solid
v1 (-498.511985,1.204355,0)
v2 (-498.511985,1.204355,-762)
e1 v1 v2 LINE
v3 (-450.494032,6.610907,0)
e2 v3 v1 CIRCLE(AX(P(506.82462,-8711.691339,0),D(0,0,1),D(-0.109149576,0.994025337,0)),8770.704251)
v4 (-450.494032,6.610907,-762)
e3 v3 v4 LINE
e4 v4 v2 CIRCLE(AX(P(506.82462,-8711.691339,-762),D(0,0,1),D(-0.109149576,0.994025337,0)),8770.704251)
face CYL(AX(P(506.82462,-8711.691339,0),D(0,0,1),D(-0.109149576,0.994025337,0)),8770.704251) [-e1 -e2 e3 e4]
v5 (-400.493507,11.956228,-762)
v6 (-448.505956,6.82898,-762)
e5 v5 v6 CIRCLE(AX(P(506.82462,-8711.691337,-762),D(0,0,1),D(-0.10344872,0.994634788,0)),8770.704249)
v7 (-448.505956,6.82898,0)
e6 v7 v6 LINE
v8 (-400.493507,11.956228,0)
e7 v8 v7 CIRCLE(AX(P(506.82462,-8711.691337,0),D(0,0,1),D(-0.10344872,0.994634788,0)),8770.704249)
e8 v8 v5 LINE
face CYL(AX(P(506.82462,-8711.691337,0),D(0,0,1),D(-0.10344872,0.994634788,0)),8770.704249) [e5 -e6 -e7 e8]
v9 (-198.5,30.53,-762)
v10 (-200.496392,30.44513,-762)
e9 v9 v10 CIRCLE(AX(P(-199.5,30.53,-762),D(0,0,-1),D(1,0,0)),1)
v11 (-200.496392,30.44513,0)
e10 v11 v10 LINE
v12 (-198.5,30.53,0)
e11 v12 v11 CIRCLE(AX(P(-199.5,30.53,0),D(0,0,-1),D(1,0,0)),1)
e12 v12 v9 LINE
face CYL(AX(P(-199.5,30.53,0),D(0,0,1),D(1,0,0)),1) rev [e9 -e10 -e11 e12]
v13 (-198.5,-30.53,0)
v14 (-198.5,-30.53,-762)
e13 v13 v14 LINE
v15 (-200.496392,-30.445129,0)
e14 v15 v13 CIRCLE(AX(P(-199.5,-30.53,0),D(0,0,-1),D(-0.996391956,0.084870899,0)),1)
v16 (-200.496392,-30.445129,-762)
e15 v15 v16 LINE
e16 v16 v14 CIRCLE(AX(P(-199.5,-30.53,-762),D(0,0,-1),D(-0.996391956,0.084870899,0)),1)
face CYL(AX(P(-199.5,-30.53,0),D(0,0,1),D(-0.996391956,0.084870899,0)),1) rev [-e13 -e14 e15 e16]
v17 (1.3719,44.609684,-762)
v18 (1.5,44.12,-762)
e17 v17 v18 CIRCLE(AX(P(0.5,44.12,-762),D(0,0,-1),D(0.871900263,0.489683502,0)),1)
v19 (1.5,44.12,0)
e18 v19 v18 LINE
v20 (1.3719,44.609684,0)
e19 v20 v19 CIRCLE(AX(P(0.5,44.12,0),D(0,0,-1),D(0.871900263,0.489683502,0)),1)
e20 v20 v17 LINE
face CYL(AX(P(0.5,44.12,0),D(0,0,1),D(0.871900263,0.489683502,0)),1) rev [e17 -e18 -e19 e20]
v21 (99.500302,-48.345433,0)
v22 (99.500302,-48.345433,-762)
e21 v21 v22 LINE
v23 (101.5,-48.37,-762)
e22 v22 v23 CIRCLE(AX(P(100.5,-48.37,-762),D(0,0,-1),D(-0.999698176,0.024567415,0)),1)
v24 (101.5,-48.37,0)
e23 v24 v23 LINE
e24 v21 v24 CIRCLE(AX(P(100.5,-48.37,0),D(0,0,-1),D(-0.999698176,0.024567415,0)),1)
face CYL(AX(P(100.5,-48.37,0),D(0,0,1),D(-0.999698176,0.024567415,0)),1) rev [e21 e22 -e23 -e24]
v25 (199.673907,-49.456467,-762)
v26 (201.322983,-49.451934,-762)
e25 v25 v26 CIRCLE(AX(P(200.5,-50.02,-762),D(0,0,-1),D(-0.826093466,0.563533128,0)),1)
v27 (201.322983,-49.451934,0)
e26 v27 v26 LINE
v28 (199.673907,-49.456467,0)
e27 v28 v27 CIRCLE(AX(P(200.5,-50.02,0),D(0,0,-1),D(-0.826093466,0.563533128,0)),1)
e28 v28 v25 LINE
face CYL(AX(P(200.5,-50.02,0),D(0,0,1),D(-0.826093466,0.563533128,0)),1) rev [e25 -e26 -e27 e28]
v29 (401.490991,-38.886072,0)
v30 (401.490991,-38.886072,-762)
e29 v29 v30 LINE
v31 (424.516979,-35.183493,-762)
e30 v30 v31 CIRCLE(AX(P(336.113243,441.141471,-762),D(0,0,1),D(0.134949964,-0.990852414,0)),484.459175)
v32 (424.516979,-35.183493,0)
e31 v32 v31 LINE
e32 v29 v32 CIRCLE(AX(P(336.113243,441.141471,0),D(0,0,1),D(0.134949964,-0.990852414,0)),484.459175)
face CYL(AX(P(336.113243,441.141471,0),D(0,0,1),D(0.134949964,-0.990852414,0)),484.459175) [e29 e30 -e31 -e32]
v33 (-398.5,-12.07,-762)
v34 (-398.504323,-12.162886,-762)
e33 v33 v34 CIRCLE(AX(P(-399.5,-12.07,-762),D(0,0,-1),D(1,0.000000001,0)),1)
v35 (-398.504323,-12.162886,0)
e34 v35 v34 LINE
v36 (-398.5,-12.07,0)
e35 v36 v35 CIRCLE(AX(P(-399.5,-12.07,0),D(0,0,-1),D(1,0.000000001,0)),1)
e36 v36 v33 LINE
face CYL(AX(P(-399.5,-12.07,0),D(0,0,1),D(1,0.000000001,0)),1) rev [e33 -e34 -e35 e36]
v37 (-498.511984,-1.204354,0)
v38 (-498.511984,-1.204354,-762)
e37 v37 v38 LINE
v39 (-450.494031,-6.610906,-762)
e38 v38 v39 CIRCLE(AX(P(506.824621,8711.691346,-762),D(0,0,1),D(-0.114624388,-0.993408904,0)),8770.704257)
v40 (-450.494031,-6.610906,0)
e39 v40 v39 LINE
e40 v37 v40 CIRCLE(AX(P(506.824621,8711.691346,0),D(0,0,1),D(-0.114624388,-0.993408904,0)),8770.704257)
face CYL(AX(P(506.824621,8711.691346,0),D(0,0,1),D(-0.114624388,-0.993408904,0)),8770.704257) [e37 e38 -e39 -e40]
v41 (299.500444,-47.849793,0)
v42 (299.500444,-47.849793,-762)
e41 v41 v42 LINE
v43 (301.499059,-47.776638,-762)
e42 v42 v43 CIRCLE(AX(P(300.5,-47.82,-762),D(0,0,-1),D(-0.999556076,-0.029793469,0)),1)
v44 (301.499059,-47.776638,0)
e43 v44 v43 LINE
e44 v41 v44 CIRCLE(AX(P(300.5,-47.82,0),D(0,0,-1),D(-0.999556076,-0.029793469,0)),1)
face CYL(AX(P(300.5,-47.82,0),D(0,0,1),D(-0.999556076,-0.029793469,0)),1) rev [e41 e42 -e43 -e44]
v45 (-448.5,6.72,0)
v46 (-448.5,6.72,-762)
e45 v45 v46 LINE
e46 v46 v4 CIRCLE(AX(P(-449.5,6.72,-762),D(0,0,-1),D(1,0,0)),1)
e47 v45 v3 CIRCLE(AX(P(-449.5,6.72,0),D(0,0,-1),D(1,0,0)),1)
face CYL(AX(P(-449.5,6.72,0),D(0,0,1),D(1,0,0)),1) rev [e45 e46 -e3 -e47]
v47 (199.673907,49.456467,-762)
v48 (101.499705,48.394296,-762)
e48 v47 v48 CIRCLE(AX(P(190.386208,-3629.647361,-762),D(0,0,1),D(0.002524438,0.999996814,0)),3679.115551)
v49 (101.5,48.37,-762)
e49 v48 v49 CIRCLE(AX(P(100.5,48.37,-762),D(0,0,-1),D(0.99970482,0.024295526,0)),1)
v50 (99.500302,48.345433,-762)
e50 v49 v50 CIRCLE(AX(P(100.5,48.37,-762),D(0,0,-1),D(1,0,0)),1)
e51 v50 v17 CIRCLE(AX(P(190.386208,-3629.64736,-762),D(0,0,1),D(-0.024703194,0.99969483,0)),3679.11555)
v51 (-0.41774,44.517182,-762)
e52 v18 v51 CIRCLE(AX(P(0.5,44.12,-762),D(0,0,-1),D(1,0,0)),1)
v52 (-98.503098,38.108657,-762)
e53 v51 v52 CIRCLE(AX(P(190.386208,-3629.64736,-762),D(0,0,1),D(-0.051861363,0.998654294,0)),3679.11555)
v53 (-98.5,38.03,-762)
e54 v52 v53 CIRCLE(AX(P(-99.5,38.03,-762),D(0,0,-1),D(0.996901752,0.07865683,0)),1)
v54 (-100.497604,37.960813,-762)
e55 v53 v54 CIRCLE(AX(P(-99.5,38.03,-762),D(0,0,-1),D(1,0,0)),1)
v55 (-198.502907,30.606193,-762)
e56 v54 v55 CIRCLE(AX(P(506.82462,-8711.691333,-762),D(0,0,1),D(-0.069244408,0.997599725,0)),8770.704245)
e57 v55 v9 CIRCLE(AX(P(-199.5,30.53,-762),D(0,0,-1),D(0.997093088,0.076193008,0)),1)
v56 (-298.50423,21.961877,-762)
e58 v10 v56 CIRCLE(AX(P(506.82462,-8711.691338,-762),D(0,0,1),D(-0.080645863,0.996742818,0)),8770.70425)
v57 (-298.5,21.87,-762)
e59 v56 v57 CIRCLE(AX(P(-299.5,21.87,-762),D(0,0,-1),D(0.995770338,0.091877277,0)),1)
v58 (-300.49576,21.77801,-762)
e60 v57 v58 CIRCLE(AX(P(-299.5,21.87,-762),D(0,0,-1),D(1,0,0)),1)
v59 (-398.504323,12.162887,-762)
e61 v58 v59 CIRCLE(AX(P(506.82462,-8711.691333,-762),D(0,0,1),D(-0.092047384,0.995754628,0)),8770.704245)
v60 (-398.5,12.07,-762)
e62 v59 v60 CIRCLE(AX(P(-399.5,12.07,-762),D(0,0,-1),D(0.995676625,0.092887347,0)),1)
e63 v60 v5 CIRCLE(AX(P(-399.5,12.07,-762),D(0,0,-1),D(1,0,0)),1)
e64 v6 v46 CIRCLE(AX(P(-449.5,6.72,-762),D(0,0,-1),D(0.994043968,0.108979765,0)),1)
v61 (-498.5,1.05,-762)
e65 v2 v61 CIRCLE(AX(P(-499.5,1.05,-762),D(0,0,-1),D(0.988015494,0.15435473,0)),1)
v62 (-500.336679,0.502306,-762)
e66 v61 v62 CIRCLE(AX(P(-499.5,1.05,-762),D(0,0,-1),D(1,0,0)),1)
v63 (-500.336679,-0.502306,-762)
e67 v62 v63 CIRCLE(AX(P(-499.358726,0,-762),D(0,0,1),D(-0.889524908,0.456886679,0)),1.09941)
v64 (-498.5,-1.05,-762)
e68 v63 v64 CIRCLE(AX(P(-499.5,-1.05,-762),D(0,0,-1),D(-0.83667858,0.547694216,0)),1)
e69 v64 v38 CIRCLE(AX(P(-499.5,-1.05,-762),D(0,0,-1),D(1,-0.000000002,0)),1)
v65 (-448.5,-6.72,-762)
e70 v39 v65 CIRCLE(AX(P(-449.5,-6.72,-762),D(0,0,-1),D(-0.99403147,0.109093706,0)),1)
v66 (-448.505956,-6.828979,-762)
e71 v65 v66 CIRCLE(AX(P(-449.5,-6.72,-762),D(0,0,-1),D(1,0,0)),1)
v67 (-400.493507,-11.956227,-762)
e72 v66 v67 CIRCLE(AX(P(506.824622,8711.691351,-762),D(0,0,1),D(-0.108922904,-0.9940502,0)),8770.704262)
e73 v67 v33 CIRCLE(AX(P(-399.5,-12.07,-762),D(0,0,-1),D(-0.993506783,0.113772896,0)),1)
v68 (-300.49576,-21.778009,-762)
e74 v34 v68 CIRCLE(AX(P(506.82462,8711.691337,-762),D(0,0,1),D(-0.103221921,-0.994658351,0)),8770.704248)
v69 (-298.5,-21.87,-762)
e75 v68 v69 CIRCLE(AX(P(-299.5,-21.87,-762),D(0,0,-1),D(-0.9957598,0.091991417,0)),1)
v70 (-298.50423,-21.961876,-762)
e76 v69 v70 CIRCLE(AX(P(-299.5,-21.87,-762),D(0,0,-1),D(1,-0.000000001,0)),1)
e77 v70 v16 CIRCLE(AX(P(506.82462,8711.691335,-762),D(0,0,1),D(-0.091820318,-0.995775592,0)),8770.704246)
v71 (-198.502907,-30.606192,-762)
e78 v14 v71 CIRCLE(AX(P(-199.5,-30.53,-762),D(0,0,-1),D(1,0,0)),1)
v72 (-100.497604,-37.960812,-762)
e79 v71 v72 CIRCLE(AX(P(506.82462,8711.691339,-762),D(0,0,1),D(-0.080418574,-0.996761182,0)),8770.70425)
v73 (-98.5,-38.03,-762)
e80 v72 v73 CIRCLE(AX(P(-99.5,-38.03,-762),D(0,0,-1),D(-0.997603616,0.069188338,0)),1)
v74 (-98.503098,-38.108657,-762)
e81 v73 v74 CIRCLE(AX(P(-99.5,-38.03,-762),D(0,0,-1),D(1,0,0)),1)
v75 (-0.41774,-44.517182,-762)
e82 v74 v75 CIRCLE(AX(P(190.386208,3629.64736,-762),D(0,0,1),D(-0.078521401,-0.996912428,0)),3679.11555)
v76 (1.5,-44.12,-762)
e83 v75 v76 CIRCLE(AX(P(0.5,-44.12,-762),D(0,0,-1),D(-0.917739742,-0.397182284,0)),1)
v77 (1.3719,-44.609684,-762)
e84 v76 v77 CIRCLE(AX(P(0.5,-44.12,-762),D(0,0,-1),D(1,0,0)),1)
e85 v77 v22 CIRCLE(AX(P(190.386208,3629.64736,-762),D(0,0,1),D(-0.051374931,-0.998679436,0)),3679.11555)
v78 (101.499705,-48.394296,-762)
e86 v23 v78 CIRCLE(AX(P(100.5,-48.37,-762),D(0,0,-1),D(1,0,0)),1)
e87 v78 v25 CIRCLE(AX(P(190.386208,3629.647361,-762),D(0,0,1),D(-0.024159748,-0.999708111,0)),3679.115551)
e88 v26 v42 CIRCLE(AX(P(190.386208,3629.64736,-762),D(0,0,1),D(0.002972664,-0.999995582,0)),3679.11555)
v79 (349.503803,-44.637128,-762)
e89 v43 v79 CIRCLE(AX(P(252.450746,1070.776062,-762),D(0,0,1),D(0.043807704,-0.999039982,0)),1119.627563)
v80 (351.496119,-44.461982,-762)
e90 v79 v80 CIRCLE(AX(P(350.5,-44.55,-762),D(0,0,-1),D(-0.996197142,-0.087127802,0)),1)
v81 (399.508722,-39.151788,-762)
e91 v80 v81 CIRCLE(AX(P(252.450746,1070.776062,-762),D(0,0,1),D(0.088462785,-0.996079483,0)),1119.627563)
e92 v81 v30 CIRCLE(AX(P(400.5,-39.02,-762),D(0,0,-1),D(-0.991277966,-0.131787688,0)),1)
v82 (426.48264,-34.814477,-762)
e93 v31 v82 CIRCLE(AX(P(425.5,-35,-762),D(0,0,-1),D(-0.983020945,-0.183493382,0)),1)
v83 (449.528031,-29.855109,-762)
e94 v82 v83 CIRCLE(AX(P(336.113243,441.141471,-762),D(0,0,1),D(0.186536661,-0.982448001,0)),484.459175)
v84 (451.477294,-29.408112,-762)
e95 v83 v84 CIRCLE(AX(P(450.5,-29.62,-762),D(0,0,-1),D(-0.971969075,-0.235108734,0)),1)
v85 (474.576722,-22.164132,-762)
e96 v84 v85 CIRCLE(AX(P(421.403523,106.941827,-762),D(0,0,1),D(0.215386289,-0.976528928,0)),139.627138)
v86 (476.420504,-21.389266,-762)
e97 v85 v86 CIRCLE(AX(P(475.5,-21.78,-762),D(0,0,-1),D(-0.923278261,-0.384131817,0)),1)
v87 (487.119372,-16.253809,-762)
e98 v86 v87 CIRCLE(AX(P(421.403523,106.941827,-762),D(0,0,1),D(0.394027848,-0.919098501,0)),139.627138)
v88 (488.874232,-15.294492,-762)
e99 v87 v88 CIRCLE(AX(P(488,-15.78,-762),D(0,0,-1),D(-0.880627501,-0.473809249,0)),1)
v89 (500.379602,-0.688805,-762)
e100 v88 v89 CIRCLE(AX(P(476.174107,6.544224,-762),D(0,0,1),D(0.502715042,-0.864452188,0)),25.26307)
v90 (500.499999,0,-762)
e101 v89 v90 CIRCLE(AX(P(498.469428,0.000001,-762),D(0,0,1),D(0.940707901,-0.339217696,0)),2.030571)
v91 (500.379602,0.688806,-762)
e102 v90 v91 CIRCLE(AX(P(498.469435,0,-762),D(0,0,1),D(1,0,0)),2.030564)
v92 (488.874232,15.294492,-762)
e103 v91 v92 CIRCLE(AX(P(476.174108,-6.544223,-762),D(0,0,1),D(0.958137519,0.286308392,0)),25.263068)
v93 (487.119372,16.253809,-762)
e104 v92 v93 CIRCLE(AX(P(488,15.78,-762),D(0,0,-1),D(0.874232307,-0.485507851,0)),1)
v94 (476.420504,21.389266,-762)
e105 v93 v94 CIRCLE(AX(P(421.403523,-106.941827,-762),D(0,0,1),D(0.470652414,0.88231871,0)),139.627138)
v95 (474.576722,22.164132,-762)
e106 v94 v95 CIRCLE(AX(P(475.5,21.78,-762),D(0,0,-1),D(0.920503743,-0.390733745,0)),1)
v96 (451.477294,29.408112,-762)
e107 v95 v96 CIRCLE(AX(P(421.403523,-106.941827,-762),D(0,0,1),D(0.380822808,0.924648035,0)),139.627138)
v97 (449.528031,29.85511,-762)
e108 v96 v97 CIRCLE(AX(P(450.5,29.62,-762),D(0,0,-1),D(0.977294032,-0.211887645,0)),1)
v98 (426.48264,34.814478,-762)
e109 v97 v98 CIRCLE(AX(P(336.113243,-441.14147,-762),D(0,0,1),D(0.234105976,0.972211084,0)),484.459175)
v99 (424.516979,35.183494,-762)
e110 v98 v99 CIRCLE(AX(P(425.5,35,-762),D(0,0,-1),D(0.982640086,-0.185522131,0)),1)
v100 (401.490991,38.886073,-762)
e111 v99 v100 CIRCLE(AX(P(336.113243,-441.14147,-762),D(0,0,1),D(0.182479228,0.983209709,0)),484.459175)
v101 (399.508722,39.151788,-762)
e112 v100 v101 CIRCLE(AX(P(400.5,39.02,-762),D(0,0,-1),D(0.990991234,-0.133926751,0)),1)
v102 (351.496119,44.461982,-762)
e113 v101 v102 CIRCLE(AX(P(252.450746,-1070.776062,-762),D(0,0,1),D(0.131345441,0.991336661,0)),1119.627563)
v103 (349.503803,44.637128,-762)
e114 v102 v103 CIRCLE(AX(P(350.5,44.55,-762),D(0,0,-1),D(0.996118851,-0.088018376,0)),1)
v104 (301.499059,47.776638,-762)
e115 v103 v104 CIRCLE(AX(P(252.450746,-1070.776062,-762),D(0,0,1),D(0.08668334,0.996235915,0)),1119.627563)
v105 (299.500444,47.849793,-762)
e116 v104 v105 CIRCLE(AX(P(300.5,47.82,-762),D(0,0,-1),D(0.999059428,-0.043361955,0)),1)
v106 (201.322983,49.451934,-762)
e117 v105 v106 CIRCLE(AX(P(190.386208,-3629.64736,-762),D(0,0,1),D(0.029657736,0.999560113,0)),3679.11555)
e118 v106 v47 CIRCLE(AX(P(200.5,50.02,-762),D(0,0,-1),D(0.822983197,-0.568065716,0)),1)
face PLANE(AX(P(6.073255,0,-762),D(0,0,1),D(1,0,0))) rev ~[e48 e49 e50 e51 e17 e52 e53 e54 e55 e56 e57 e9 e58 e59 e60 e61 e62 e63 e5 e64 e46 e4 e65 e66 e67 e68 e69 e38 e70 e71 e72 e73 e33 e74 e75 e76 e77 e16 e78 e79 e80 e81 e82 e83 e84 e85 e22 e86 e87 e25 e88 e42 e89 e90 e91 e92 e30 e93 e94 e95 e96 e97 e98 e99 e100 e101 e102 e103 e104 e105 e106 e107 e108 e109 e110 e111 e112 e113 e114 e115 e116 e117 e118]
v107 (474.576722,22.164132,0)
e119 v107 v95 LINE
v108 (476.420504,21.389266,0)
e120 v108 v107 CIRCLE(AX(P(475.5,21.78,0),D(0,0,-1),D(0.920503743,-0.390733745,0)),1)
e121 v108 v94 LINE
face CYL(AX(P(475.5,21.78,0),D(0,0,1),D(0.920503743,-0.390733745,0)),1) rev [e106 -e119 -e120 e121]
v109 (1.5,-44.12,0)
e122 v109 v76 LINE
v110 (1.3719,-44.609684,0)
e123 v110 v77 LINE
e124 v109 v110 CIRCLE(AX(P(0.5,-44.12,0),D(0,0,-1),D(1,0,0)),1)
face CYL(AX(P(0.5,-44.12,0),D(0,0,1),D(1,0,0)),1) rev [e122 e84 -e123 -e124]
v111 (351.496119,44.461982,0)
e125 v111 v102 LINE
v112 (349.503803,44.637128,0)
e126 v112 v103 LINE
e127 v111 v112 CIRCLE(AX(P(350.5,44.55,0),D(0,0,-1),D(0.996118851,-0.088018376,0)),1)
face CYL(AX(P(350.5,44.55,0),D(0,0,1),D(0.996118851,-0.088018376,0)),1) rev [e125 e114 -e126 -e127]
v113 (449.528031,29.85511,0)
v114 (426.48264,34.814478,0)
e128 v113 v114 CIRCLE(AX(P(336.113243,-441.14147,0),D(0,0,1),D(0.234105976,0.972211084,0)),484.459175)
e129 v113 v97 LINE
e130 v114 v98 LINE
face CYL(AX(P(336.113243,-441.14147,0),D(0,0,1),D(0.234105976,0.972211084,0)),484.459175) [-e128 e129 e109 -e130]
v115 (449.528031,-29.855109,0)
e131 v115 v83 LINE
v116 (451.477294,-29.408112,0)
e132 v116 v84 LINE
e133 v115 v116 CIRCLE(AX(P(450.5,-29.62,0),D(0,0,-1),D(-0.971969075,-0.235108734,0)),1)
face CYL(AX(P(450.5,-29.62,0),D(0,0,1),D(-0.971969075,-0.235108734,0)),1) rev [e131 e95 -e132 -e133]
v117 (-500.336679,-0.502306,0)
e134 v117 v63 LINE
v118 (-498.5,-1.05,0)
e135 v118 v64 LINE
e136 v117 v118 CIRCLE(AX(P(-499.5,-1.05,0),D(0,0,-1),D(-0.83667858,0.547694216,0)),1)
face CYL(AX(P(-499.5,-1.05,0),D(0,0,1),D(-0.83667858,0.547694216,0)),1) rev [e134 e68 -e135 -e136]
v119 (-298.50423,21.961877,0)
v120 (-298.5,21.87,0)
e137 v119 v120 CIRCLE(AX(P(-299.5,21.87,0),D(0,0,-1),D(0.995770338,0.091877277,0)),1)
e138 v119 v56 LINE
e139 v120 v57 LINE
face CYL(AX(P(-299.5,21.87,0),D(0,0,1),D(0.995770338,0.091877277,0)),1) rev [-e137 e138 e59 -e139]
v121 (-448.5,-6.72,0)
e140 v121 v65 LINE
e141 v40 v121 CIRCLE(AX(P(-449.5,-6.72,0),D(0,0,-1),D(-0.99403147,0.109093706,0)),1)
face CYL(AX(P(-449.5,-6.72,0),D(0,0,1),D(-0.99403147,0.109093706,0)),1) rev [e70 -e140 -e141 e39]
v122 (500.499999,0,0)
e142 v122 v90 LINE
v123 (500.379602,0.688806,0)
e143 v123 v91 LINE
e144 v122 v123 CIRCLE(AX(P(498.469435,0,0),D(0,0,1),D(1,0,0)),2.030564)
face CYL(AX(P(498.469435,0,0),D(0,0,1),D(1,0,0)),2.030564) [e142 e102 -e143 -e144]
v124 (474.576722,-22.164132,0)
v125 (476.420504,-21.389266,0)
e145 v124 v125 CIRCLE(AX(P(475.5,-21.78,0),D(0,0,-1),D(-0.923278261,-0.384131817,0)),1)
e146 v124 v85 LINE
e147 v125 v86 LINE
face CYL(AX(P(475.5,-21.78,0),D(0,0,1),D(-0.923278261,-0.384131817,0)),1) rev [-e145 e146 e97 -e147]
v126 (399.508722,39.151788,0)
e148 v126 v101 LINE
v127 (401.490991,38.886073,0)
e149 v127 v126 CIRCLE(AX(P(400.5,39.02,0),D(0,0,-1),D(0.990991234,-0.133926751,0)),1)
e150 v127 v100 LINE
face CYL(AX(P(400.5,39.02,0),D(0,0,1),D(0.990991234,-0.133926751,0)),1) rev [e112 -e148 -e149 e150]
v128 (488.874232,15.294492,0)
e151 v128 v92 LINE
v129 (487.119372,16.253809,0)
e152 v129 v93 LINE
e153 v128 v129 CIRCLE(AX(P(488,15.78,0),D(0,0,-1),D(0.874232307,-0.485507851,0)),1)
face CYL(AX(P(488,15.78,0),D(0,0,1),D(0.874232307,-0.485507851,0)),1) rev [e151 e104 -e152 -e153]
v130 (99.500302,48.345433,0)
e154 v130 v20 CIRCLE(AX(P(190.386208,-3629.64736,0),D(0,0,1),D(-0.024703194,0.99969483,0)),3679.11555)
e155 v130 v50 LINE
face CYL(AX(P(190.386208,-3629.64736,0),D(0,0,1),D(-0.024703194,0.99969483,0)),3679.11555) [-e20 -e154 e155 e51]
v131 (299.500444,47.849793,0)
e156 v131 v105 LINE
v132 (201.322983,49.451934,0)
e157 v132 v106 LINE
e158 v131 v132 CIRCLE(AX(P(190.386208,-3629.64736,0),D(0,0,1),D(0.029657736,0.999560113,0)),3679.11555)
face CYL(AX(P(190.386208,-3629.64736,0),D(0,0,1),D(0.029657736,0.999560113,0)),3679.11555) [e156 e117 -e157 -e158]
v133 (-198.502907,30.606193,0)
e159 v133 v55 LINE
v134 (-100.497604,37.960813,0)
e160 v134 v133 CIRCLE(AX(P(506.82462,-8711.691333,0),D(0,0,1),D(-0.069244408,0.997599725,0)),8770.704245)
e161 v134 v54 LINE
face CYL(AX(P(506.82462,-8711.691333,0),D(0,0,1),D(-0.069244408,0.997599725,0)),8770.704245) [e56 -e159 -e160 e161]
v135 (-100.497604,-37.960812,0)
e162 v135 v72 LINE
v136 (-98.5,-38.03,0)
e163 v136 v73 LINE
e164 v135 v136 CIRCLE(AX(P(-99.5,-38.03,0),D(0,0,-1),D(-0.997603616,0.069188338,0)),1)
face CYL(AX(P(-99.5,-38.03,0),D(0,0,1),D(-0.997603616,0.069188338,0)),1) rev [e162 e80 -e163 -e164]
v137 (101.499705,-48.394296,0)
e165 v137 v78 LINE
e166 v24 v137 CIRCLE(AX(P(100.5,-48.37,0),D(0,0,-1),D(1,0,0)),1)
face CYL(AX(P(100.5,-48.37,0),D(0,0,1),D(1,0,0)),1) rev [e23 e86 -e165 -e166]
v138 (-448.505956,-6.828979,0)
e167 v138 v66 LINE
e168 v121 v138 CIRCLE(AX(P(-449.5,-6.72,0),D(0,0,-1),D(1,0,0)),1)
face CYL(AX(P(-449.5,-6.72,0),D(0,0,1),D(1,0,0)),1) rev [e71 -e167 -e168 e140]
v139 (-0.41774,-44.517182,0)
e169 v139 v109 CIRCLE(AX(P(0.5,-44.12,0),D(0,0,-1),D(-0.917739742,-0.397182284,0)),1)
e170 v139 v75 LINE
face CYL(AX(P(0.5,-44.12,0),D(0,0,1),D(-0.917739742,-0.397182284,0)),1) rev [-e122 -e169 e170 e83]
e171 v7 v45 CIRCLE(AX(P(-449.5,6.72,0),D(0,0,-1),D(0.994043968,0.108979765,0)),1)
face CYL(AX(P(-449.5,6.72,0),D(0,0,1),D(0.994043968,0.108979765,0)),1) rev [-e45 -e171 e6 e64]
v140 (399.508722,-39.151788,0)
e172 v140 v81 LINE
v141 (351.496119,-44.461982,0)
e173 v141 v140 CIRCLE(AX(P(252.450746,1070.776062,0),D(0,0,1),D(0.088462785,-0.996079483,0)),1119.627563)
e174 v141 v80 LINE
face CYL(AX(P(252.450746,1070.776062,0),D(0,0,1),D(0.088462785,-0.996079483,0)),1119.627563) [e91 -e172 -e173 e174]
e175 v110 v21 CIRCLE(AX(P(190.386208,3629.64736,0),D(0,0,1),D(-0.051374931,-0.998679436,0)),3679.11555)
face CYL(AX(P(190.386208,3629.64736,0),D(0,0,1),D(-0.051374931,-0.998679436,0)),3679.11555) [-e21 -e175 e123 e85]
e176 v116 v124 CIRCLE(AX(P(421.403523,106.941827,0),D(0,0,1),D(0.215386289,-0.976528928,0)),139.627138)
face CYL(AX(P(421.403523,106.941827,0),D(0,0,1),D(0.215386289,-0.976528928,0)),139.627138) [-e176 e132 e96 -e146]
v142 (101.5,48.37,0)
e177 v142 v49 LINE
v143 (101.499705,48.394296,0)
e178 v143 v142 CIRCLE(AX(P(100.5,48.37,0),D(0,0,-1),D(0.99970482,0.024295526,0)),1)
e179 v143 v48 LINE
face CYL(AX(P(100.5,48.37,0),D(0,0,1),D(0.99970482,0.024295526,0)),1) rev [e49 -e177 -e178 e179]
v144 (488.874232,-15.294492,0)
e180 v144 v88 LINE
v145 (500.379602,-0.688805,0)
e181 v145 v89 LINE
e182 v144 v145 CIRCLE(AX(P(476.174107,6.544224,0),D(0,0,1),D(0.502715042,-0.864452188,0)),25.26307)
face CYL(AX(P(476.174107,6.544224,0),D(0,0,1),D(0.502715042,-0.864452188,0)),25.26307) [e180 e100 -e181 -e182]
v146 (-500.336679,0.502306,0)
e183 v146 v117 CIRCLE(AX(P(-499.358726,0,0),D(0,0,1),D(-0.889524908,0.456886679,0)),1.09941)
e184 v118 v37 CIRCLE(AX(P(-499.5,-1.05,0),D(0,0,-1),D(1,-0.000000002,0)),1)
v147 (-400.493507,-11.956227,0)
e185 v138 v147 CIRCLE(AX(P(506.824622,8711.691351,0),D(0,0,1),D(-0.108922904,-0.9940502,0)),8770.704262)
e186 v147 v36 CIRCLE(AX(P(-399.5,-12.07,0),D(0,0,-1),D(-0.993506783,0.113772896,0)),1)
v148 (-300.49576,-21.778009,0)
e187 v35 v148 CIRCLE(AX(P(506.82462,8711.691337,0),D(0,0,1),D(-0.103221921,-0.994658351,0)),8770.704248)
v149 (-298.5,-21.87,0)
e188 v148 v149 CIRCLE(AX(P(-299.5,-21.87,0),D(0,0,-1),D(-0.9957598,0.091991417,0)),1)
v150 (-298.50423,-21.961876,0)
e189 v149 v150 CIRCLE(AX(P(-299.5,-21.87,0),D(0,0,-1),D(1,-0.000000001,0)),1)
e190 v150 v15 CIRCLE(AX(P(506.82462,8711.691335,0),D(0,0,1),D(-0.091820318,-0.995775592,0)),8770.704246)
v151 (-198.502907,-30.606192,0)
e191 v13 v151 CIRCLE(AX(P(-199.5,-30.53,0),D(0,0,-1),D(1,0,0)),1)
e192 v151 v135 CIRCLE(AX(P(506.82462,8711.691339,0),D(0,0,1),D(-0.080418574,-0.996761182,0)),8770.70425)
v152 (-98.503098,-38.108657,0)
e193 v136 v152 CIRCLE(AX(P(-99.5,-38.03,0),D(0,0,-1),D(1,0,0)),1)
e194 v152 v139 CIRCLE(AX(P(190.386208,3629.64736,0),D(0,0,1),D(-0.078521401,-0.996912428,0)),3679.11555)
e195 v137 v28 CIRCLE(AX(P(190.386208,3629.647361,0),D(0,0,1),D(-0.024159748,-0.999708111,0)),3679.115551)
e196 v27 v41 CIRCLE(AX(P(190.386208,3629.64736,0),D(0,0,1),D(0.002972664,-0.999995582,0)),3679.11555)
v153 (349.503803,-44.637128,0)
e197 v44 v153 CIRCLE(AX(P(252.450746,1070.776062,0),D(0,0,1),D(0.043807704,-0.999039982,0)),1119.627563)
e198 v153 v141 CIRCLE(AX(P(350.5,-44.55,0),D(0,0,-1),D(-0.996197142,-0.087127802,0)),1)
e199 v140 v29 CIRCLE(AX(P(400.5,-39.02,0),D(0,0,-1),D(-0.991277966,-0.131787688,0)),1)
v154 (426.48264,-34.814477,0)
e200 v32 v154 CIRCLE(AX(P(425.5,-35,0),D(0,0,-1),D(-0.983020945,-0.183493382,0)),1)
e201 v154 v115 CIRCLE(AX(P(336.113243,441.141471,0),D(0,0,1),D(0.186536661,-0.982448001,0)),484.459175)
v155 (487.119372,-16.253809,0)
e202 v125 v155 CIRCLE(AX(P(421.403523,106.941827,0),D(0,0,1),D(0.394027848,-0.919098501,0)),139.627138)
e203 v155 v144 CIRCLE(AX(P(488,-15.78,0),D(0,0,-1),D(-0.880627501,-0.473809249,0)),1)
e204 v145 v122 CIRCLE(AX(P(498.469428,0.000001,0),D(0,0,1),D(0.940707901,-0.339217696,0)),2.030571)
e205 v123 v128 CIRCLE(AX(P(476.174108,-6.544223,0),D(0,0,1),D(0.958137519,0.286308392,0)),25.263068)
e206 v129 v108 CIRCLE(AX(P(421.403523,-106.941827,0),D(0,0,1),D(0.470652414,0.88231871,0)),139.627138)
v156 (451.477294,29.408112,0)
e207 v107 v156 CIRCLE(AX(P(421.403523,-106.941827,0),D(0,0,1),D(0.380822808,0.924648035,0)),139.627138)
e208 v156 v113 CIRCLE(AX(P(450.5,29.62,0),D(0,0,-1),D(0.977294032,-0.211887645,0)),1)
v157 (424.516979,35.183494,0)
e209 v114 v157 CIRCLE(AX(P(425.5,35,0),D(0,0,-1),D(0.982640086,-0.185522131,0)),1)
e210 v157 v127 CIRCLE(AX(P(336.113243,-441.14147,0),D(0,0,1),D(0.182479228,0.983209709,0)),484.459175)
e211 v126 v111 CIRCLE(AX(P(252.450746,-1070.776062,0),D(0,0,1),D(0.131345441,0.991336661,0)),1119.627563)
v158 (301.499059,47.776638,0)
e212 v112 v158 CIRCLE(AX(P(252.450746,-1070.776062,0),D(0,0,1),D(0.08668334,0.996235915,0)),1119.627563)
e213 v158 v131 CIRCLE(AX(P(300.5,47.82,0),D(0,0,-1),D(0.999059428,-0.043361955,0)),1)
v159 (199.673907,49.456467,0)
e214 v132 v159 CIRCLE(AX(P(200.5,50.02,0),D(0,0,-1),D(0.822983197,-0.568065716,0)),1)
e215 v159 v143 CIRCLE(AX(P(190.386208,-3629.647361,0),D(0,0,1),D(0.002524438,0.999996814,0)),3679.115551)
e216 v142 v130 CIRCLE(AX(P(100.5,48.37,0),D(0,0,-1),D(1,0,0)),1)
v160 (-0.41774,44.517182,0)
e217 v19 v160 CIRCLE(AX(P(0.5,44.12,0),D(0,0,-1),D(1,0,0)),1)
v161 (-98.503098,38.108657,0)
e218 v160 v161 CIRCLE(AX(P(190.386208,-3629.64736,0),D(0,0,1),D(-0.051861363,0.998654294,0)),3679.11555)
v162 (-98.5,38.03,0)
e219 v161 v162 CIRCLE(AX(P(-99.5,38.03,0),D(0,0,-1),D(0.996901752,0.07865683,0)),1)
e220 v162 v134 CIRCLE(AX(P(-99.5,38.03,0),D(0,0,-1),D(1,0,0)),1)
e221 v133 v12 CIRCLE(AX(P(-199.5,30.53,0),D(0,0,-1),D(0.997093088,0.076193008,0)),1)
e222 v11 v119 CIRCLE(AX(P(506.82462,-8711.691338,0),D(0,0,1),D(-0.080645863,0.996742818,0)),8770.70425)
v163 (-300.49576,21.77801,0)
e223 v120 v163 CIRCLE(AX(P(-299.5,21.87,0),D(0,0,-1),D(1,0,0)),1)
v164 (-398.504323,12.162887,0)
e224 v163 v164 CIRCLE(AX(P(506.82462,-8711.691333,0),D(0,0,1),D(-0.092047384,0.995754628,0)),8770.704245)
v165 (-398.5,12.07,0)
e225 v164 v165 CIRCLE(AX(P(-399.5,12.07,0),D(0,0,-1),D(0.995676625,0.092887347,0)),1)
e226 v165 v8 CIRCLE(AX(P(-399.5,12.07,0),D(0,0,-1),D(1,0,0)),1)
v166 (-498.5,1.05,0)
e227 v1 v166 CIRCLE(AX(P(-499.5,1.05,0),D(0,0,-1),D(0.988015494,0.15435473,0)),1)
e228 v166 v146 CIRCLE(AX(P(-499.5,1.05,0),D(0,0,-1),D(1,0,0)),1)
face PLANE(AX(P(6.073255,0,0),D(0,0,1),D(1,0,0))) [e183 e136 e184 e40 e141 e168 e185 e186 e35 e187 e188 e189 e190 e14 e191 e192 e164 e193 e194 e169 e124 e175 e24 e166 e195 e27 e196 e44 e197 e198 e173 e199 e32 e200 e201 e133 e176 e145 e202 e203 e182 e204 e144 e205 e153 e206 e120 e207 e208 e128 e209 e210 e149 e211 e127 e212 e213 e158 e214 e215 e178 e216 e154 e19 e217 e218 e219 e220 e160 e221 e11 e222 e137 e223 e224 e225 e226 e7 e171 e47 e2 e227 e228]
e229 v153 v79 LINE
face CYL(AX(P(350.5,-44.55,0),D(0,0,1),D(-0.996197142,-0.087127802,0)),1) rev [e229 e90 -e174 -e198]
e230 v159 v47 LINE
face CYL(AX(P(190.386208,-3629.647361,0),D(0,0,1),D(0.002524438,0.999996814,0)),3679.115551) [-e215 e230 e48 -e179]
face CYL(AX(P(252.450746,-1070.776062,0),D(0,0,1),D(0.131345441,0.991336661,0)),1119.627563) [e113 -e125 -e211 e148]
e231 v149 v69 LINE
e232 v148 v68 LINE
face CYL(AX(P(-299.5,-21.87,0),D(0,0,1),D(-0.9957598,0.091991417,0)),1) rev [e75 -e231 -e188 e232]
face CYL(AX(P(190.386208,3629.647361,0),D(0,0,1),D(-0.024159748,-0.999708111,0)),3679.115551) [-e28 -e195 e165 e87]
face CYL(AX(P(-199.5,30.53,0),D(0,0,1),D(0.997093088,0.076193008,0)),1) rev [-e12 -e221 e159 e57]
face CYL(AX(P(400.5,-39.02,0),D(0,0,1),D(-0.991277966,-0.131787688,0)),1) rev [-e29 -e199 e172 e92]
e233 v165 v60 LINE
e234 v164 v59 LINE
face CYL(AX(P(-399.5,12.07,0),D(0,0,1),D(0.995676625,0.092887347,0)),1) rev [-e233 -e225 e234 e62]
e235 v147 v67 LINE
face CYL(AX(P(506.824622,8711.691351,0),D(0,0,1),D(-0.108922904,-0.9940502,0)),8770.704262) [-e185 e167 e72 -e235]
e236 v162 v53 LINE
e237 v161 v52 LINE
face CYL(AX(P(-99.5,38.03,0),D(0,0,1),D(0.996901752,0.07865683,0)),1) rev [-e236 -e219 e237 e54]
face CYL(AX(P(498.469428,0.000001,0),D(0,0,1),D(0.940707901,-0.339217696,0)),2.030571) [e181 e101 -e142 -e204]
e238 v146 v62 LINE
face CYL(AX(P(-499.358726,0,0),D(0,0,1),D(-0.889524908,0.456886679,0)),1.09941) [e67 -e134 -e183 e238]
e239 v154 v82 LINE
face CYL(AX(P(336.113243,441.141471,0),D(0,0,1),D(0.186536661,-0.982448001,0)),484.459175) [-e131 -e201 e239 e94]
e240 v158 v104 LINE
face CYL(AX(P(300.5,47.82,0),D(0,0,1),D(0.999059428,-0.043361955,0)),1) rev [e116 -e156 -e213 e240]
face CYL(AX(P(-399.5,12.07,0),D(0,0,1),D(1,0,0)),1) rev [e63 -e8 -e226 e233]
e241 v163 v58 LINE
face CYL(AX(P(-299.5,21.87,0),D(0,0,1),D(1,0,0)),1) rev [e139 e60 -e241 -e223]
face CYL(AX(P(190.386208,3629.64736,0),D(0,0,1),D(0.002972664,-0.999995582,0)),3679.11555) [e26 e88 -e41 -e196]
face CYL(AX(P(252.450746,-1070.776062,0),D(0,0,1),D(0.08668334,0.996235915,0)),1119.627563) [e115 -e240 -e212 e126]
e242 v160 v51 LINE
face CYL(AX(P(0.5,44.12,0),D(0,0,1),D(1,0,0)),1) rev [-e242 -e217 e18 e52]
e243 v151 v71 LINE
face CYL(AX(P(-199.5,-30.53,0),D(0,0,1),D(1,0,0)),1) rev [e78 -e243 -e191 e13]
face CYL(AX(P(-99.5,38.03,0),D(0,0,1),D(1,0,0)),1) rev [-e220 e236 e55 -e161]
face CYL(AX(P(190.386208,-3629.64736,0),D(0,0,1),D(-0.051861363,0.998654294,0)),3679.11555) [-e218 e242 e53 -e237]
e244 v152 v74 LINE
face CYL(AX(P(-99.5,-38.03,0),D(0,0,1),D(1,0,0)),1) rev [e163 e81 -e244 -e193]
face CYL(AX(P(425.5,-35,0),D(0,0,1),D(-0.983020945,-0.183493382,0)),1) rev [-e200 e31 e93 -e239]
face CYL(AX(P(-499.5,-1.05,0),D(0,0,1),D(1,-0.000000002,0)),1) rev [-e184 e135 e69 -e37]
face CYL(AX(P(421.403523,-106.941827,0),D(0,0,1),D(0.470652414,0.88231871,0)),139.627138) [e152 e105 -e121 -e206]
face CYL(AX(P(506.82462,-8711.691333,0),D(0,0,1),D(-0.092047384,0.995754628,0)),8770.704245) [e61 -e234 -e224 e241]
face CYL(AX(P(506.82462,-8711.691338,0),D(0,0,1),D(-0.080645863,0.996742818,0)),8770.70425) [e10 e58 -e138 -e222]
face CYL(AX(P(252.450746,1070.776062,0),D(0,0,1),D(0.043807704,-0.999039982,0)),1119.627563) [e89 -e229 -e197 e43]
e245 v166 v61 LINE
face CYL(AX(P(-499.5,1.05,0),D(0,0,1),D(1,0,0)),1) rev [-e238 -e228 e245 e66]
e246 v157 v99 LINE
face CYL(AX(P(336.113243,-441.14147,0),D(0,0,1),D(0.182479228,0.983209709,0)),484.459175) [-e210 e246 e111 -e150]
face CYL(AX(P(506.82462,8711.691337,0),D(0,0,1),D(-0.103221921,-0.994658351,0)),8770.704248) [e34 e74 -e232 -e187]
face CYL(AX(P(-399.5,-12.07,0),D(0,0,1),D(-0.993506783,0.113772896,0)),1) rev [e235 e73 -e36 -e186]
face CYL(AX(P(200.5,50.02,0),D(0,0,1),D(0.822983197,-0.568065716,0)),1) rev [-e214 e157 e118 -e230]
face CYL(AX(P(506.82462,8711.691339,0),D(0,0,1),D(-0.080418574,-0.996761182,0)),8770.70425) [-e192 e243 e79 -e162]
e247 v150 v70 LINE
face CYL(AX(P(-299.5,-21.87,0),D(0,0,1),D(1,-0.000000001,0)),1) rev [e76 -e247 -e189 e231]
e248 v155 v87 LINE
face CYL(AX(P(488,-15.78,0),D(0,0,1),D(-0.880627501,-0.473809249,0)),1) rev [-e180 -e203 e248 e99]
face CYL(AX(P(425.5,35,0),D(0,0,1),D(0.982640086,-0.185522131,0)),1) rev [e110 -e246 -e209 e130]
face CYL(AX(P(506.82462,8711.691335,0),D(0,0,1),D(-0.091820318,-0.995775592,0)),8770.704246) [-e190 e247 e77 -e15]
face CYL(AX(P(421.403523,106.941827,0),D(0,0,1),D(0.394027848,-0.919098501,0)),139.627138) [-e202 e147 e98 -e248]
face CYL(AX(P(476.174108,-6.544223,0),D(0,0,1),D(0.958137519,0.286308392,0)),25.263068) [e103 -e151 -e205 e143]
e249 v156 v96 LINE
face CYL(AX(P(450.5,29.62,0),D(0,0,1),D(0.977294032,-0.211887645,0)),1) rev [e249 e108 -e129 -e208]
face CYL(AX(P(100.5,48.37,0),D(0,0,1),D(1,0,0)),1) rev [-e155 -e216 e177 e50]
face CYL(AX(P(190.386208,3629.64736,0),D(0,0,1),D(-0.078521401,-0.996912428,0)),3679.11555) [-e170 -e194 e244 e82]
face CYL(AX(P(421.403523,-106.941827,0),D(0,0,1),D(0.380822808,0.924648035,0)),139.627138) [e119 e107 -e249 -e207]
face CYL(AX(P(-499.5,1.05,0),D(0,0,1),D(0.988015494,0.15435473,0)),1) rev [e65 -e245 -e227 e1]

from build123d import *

# Parameters (mm, degrees)
F1_DEPTH = 762


# Not quite as in the source:
# - ends of sketch curves that miss each other by under 0.0002 mm in the source are joined


with BuildPart() as f1:
    # F0 (on Top) → F1 (new body)
    with BuildSketch(Plane.XY):
        with BuildLine():
            ThreePointArc((488.8742323068, 15.2944921486), (487.5203307918, 14.9025505993), (487.1193724988, 16.2538092487))
            ThreePointArc((487.1193724988, 16.2538092487), (481.824523523, 18.9352573397), (476.4205037428, 21.389266255))
            ThreePointArc((476.4205037428, 21.389266255), (475.1125647356, 20.8581030883), (474.5767217389, 22.1641318166))
            ThreePointArc((474.5767217389, 22.1641318166), (463.1842997703, 26.2876905948), (451.4772940324, 29.4081123545))
            ThreePointArc((451.4772940324, 29.4081123545), (450.276485478, 28.6452994006), (449.5280311535, 29.8551096795))
            ThreePointArc((449.5280311535, 29.8551096795), (438.0355044136, 32.4749833354), (426.4826400862, 34.8144778691))
            ThreePointArc((426.4826400862, 34.8144778691), (425.3154916622, 34.0171690515), (424.5169792351, 35.1834943482))
            ThreePointArc((424.5169792351, 35.1834943482), (413.0262686458, 37.1733622263), (401.4909912337, 38.8860732489))
            ThreePointArc((401.4909912337, 38.8860732489), (400.3671427029, 38.0288648232), (399.5087220344, 39.1517876884))
            ThreePointArc((399.5087220344, 39.1517876884), (375.5310617416, 42.0658475749), (351.4961188511, 44.4619816239))
            ThreePointArc((351.4961188511, 44.4619816239), (350.4124269023, 43.5538419038), (349.5038028578, 44.6371278018))
            ThreePointArc((349.5038028578, 44.6371278018), (325.5182950967, 46.4647415416), (301.4990594281, 47.7766380455))
            ThreePointArc((301.4990594281, 47.7766380455), (300.4634214455, 46.8206692193), (299.5004439239, 47.8497934687))
            ThreePointArc((299.5004439239, 47.8497934687), (250.4170586651, 48.9784061279), (201.3229831968, 49.4519342839))
            ThreePointArc((201.3229831968, 49.4519342839), (200.4972514489, 49.0200037773), (199.6739065342, 49.4564668725))
            ThreePointArc((199.6739065342, 49.4564668725), (150.5832624149, 49.2528772685), (101.4997048201, 48.3942955287))
            ThreePointArc((101.4997048201, 48.3942955287), (101.4999262023, 48.3821486609), (101.5, 48.37))
            ThreePointArc((101.5, 48.37), (100.5122846343, 47.370075459), (99.5003018245, 48.3454325854))
            ThreePointArc((99.5003018245, 48.3454325854), (50.4236366017, 46.8049664772), (1.3719002627, 44.6096835018))
            ThreePointArc((1.3719002627, 44.6096835018), (1.4674451568, 44.3730807552), (1.5, 44.12))
            ThreePointArc((1.5, 44.12), (0.297194356, 43.1407809894), (-0.4177397415, 44.5171822841))
            ThreePointArc((-0.4177397415, 44.5171822841), (-49.4818219256, 41.6405010198), (-98.503098248, 38.1086568293))
            ThreePointArc((-98.503098248, 38.1086568293), (-98.5007748622, 38.0693589124), (-98.5, 38.03))
            ThreePointArc((-98.5, 38.03), (-99.4653855857, 37.0305992584), (-100.4976036846, 37.9608126573))
            ThreePointArc((-100.4976036846, 37.9608126573), (-149.5105569813, 34.4207797542), (-198.5029069122, 30.606193006))
            ThreePointArc((-198.5029069122, 30.606193006), (-198.5007269923, 30.568124219), (-198.5, 30.53))
            ThreePointArc((-198.5, 30.53), (-199.4575267193, 29.5309023969), (-200.4963920408, 30.445130094))
            ThreePointArc((-200.4963920408, 30.445130094), (-249.5122047164, 26.3409146536), (-298.5042296621, 21.9618772772))
            ThreePointArc((-298.5042296621, 21.9618772772), (-298.5010579752, 21.915987292), (-298.5, 21.87))
            ThreePointArc((-298.5, 21.87), (-299.4539559536, 20.8710605895), (-300.4957598916, 21.7780095749))
            ThreePointArc((-300.4957598916, 21.7780095749), (-349.5135367847, 17.1080068146), (-398.5043233752, 12.1628873449))
            ThreePointArc((-398.5043233752, 12.1628873449), (-398.5010814285, 12.1164939523), (-398.5, 12.07))
            ThreePointArc((-398.5, 12.07), (-399.443021479, 11.0716245956), (-400.4935068963, 11.9562280921))
            ThreePointArc((-400.4935068963, 11.9562280921), (-424.5032598568, 9.4256444152), (-448.5059560316, 6.8289797637))
            ThreePointArc((-448.5059560316, 6.8289797637), (-448.5014901181, 6.7745711994), (-448.5, 6.72))
            ThreePointArc((-448.5, 6.72), (-449.4453720697, 5.7214932202), (-450.4940315785, 6.6109072825))
            ThreePointArc((-450.4940315785, 6.6109072825), (-474.5067314104, 3.9406998666), (-498.5119845054, 1.2043547292))
            ThreePointArc((-498.5119845054, 1.2043547292), (-498.5030006282, 1.1274096421), (-498.5, 1.05))
            ThreePointArc((-498.5, 1.05), (-499.2142366184, 0.0916997914), (-500.3366785795, 0.5023057837))
            ThreePointArc((-500.3366785795, 0.5023057837), (-500.458136, 0), (-500.3366785795, -0.5023057837))
            ThreePointArc((-500.3366785795, -0.5023057837), (-499.2142366184, -0.0916997914), (-498.5, -1.05))
            ThreePointArc((-498.5, -1.05), (-498.5030005898, -1.1274091465), (-498.5119843519, -1.2043537469))
            ThreePointArc((-498.5119843519, -1.2043537469), (-474.5067312795, -3.9406988813), (-450.49403147, -6.6109062944))
            ThreePointArc((-450.49403147, -6.6109062944), (-449.4453715735, -5.7214932474), (-448.5, -6.72))
            ThreePointArc((-448.5, -6.72), (-448.501490091, -6.7745707031), (-448.5059559233, -6.8289787756))
            ThreePointArc((-448.5059559233, -6.8289787756), (-424.5032597461, -9.425643427), (-400.4935067831, -11.9562271039))
            ThreePointArc((-400.4935067831, -11.9562271039), (-399.4430209825, -11.0716246239), (-398.5, -12.07))
            ThreePointArc((-398.5, -12.07), (-398.5010814054, -12.1164934555), (-398.5043232828, -12.1628863545))
            ThreePointArc((-398.5043232828, -12.1628863545), (-349.5135366927, -17.1080058236), (-300.4957598, -21.7780085834))
            ThreePointArc((-300.4957598, -21.7780085834), (-299.4539554563, -20.8710606125), (-298.5, -21.87))
            ThreePointArc((-298.5, -21.87), (-298.5010579523, -21.9159867947), (-298.5042295706, -21.9618762856))
            ThreePointArc((-298.5042295706, -21.9618762856), (-249.5122046283, -26.3409136613), (-200.4963919562, -30.4451291009))
            ThreePointArc((-200.4963919562, -30.4451291009), (-199.4575262213, -29.5309024181), (-198.5, -30.53))
            ThreePointArc((-198.5, -30.53), (-198.5007269733, -30.568123721), (-198.5029068362, -30.6061920122))
            ThreePointArc((-198.5029068362, -30.6061920122), (-149.5105569088, -34.4207787596), (-100.4976036156, -37.9608116621))
            ThreePointArc((-100.4976036156, -37.9608116621), (-99.4653850872, -37.0305992757), (-98.5, -38.03))
            ThreePointArc((-98.5, -38.03), (-98.5007748622, -38.0693589124), (-98.503098248, -38.1086568293))
            ThreePointArc((-98.503098248, -38.1086568293), (-49.4818219256, -41.6405010198), (-0.4177397415, -44.5171822841))
            ThreePointArc((-0.4177397415, -44.5171822841), (0.297194356, -43.1407809894), (1.5, -44.12))
            ThreePointArc((1.5, -44.12), (1.4674451568, -44.3730807552), (1.3719002627, -44.6096835018))
            ThreePointArc((1.3719002627, -44.6096835018), (50.4236366017, -46.8049664772), (99.5003018245, -48.3454325854))
            ThreePointArc((99.5003018245, -48.3454325854), (100.5122846343, -47.370075459), (101.5, -48.37))
            ThreePointArc((101.5, -48.37), (101.4999262023, -48.3821486609), (101.4997048201, -48.3942955287))
            ThreePointArc((101.4997048201, -48.3942955287), (150.5832624149, -49.2528772685), (199.6739065342, -49.4564668725))
            ThreePointArc((199.6739065342, -49.4564668725), (200.4972514489, -49.0200037773), (201.3229831968, -49.4519342839))
            ThreePointArc((201.3229831968, -49.4519342839), (250.4170586651, -48.9784061279), (299.5004439239, -47.8497934687))
            ThreePointArc((299.5004439239, -47.8497934687), (300.4634214455, -46.8206692193), (301.4990594281, -47.7766380455))
            ThreePointArc((301.4990594281, -47.7766380455), (325.5182950967, -46.4647415416), (349.5038028578, -44.6371278018))
            ThreePointArc((349.5038028578, -44.6371278018), (350.4124269023, -43.5538419038), (351.4961188511, -44.4619816239))
            ThreePointArc((351.4961188511, -44.4619816239), (375.5310617416, -42.0658475749), (399.5087220344, -39.1517876884))
            ThreePointArc((399.5087220344, -39.1517876884), (400.3671422118, -38.0288648891), (401.490991101, -38.886072267))
            ThreePointArc((401.490991101, -38.886072267), (413.0262684891, -37.1733612515), (424.5169790547, -35.1834933817))
            ThreePointArc((424.5169790547, -35.1834933817), (425.3154916626, -34.0171690514), (426.4826399039, -34.8144769037))
            ThreePointArc((426.4826399039, -34.8144769037), (438.035504208, -32.4749823797), (449.5280309249, -29.8551087345))
            ThreePointArc((449.5280309249, -29.8551087345), (450.2764859518, -28.645299292), (451.4772940324, -29.4081123545))
            ThreePointArc((451.4772940324, -29.4081123545), (463.1842997703, -26.2876905948), (474.5767217389, -22.1641318166))
            ThreePointArc((474.5767217389, -22.1641318166), (475.1125647356, -20.8581030883), (476.4205037428, -21.389266255))
            ThreePointArc((476.4205037428, -21.389266255), (481.824523523, -18.9352573397), (487.1193724988, -16.2538092487))
            ThreePointArc((487.1193724988, -16.2538092487), (487.5203307918, -14.9025505993), (488.8742323068, -15.2944921486))
            ThreePointArc((488.8742323068, -15.2944921486), (496.019452289, -9.0885932824), (500.3796021729, -0.6888050517))
            ThreePointArc((500.3796021729, -0.6888050517), (500.4696732905, -0.3496239971), (500.499999, 0))
            ThreePointArc((500.499999, 0), (500.4696732095, 0.3496244605), (500.379601649, 0.6888058734))
            ThreePointArc((500.379601649, 0.6888058734), (496.0194519925, 9.0885936587), (488.8742323068, 15.2944921486))
        make_face()
    extrude(amount=-F1_DEPTH)


solid = f1.part
